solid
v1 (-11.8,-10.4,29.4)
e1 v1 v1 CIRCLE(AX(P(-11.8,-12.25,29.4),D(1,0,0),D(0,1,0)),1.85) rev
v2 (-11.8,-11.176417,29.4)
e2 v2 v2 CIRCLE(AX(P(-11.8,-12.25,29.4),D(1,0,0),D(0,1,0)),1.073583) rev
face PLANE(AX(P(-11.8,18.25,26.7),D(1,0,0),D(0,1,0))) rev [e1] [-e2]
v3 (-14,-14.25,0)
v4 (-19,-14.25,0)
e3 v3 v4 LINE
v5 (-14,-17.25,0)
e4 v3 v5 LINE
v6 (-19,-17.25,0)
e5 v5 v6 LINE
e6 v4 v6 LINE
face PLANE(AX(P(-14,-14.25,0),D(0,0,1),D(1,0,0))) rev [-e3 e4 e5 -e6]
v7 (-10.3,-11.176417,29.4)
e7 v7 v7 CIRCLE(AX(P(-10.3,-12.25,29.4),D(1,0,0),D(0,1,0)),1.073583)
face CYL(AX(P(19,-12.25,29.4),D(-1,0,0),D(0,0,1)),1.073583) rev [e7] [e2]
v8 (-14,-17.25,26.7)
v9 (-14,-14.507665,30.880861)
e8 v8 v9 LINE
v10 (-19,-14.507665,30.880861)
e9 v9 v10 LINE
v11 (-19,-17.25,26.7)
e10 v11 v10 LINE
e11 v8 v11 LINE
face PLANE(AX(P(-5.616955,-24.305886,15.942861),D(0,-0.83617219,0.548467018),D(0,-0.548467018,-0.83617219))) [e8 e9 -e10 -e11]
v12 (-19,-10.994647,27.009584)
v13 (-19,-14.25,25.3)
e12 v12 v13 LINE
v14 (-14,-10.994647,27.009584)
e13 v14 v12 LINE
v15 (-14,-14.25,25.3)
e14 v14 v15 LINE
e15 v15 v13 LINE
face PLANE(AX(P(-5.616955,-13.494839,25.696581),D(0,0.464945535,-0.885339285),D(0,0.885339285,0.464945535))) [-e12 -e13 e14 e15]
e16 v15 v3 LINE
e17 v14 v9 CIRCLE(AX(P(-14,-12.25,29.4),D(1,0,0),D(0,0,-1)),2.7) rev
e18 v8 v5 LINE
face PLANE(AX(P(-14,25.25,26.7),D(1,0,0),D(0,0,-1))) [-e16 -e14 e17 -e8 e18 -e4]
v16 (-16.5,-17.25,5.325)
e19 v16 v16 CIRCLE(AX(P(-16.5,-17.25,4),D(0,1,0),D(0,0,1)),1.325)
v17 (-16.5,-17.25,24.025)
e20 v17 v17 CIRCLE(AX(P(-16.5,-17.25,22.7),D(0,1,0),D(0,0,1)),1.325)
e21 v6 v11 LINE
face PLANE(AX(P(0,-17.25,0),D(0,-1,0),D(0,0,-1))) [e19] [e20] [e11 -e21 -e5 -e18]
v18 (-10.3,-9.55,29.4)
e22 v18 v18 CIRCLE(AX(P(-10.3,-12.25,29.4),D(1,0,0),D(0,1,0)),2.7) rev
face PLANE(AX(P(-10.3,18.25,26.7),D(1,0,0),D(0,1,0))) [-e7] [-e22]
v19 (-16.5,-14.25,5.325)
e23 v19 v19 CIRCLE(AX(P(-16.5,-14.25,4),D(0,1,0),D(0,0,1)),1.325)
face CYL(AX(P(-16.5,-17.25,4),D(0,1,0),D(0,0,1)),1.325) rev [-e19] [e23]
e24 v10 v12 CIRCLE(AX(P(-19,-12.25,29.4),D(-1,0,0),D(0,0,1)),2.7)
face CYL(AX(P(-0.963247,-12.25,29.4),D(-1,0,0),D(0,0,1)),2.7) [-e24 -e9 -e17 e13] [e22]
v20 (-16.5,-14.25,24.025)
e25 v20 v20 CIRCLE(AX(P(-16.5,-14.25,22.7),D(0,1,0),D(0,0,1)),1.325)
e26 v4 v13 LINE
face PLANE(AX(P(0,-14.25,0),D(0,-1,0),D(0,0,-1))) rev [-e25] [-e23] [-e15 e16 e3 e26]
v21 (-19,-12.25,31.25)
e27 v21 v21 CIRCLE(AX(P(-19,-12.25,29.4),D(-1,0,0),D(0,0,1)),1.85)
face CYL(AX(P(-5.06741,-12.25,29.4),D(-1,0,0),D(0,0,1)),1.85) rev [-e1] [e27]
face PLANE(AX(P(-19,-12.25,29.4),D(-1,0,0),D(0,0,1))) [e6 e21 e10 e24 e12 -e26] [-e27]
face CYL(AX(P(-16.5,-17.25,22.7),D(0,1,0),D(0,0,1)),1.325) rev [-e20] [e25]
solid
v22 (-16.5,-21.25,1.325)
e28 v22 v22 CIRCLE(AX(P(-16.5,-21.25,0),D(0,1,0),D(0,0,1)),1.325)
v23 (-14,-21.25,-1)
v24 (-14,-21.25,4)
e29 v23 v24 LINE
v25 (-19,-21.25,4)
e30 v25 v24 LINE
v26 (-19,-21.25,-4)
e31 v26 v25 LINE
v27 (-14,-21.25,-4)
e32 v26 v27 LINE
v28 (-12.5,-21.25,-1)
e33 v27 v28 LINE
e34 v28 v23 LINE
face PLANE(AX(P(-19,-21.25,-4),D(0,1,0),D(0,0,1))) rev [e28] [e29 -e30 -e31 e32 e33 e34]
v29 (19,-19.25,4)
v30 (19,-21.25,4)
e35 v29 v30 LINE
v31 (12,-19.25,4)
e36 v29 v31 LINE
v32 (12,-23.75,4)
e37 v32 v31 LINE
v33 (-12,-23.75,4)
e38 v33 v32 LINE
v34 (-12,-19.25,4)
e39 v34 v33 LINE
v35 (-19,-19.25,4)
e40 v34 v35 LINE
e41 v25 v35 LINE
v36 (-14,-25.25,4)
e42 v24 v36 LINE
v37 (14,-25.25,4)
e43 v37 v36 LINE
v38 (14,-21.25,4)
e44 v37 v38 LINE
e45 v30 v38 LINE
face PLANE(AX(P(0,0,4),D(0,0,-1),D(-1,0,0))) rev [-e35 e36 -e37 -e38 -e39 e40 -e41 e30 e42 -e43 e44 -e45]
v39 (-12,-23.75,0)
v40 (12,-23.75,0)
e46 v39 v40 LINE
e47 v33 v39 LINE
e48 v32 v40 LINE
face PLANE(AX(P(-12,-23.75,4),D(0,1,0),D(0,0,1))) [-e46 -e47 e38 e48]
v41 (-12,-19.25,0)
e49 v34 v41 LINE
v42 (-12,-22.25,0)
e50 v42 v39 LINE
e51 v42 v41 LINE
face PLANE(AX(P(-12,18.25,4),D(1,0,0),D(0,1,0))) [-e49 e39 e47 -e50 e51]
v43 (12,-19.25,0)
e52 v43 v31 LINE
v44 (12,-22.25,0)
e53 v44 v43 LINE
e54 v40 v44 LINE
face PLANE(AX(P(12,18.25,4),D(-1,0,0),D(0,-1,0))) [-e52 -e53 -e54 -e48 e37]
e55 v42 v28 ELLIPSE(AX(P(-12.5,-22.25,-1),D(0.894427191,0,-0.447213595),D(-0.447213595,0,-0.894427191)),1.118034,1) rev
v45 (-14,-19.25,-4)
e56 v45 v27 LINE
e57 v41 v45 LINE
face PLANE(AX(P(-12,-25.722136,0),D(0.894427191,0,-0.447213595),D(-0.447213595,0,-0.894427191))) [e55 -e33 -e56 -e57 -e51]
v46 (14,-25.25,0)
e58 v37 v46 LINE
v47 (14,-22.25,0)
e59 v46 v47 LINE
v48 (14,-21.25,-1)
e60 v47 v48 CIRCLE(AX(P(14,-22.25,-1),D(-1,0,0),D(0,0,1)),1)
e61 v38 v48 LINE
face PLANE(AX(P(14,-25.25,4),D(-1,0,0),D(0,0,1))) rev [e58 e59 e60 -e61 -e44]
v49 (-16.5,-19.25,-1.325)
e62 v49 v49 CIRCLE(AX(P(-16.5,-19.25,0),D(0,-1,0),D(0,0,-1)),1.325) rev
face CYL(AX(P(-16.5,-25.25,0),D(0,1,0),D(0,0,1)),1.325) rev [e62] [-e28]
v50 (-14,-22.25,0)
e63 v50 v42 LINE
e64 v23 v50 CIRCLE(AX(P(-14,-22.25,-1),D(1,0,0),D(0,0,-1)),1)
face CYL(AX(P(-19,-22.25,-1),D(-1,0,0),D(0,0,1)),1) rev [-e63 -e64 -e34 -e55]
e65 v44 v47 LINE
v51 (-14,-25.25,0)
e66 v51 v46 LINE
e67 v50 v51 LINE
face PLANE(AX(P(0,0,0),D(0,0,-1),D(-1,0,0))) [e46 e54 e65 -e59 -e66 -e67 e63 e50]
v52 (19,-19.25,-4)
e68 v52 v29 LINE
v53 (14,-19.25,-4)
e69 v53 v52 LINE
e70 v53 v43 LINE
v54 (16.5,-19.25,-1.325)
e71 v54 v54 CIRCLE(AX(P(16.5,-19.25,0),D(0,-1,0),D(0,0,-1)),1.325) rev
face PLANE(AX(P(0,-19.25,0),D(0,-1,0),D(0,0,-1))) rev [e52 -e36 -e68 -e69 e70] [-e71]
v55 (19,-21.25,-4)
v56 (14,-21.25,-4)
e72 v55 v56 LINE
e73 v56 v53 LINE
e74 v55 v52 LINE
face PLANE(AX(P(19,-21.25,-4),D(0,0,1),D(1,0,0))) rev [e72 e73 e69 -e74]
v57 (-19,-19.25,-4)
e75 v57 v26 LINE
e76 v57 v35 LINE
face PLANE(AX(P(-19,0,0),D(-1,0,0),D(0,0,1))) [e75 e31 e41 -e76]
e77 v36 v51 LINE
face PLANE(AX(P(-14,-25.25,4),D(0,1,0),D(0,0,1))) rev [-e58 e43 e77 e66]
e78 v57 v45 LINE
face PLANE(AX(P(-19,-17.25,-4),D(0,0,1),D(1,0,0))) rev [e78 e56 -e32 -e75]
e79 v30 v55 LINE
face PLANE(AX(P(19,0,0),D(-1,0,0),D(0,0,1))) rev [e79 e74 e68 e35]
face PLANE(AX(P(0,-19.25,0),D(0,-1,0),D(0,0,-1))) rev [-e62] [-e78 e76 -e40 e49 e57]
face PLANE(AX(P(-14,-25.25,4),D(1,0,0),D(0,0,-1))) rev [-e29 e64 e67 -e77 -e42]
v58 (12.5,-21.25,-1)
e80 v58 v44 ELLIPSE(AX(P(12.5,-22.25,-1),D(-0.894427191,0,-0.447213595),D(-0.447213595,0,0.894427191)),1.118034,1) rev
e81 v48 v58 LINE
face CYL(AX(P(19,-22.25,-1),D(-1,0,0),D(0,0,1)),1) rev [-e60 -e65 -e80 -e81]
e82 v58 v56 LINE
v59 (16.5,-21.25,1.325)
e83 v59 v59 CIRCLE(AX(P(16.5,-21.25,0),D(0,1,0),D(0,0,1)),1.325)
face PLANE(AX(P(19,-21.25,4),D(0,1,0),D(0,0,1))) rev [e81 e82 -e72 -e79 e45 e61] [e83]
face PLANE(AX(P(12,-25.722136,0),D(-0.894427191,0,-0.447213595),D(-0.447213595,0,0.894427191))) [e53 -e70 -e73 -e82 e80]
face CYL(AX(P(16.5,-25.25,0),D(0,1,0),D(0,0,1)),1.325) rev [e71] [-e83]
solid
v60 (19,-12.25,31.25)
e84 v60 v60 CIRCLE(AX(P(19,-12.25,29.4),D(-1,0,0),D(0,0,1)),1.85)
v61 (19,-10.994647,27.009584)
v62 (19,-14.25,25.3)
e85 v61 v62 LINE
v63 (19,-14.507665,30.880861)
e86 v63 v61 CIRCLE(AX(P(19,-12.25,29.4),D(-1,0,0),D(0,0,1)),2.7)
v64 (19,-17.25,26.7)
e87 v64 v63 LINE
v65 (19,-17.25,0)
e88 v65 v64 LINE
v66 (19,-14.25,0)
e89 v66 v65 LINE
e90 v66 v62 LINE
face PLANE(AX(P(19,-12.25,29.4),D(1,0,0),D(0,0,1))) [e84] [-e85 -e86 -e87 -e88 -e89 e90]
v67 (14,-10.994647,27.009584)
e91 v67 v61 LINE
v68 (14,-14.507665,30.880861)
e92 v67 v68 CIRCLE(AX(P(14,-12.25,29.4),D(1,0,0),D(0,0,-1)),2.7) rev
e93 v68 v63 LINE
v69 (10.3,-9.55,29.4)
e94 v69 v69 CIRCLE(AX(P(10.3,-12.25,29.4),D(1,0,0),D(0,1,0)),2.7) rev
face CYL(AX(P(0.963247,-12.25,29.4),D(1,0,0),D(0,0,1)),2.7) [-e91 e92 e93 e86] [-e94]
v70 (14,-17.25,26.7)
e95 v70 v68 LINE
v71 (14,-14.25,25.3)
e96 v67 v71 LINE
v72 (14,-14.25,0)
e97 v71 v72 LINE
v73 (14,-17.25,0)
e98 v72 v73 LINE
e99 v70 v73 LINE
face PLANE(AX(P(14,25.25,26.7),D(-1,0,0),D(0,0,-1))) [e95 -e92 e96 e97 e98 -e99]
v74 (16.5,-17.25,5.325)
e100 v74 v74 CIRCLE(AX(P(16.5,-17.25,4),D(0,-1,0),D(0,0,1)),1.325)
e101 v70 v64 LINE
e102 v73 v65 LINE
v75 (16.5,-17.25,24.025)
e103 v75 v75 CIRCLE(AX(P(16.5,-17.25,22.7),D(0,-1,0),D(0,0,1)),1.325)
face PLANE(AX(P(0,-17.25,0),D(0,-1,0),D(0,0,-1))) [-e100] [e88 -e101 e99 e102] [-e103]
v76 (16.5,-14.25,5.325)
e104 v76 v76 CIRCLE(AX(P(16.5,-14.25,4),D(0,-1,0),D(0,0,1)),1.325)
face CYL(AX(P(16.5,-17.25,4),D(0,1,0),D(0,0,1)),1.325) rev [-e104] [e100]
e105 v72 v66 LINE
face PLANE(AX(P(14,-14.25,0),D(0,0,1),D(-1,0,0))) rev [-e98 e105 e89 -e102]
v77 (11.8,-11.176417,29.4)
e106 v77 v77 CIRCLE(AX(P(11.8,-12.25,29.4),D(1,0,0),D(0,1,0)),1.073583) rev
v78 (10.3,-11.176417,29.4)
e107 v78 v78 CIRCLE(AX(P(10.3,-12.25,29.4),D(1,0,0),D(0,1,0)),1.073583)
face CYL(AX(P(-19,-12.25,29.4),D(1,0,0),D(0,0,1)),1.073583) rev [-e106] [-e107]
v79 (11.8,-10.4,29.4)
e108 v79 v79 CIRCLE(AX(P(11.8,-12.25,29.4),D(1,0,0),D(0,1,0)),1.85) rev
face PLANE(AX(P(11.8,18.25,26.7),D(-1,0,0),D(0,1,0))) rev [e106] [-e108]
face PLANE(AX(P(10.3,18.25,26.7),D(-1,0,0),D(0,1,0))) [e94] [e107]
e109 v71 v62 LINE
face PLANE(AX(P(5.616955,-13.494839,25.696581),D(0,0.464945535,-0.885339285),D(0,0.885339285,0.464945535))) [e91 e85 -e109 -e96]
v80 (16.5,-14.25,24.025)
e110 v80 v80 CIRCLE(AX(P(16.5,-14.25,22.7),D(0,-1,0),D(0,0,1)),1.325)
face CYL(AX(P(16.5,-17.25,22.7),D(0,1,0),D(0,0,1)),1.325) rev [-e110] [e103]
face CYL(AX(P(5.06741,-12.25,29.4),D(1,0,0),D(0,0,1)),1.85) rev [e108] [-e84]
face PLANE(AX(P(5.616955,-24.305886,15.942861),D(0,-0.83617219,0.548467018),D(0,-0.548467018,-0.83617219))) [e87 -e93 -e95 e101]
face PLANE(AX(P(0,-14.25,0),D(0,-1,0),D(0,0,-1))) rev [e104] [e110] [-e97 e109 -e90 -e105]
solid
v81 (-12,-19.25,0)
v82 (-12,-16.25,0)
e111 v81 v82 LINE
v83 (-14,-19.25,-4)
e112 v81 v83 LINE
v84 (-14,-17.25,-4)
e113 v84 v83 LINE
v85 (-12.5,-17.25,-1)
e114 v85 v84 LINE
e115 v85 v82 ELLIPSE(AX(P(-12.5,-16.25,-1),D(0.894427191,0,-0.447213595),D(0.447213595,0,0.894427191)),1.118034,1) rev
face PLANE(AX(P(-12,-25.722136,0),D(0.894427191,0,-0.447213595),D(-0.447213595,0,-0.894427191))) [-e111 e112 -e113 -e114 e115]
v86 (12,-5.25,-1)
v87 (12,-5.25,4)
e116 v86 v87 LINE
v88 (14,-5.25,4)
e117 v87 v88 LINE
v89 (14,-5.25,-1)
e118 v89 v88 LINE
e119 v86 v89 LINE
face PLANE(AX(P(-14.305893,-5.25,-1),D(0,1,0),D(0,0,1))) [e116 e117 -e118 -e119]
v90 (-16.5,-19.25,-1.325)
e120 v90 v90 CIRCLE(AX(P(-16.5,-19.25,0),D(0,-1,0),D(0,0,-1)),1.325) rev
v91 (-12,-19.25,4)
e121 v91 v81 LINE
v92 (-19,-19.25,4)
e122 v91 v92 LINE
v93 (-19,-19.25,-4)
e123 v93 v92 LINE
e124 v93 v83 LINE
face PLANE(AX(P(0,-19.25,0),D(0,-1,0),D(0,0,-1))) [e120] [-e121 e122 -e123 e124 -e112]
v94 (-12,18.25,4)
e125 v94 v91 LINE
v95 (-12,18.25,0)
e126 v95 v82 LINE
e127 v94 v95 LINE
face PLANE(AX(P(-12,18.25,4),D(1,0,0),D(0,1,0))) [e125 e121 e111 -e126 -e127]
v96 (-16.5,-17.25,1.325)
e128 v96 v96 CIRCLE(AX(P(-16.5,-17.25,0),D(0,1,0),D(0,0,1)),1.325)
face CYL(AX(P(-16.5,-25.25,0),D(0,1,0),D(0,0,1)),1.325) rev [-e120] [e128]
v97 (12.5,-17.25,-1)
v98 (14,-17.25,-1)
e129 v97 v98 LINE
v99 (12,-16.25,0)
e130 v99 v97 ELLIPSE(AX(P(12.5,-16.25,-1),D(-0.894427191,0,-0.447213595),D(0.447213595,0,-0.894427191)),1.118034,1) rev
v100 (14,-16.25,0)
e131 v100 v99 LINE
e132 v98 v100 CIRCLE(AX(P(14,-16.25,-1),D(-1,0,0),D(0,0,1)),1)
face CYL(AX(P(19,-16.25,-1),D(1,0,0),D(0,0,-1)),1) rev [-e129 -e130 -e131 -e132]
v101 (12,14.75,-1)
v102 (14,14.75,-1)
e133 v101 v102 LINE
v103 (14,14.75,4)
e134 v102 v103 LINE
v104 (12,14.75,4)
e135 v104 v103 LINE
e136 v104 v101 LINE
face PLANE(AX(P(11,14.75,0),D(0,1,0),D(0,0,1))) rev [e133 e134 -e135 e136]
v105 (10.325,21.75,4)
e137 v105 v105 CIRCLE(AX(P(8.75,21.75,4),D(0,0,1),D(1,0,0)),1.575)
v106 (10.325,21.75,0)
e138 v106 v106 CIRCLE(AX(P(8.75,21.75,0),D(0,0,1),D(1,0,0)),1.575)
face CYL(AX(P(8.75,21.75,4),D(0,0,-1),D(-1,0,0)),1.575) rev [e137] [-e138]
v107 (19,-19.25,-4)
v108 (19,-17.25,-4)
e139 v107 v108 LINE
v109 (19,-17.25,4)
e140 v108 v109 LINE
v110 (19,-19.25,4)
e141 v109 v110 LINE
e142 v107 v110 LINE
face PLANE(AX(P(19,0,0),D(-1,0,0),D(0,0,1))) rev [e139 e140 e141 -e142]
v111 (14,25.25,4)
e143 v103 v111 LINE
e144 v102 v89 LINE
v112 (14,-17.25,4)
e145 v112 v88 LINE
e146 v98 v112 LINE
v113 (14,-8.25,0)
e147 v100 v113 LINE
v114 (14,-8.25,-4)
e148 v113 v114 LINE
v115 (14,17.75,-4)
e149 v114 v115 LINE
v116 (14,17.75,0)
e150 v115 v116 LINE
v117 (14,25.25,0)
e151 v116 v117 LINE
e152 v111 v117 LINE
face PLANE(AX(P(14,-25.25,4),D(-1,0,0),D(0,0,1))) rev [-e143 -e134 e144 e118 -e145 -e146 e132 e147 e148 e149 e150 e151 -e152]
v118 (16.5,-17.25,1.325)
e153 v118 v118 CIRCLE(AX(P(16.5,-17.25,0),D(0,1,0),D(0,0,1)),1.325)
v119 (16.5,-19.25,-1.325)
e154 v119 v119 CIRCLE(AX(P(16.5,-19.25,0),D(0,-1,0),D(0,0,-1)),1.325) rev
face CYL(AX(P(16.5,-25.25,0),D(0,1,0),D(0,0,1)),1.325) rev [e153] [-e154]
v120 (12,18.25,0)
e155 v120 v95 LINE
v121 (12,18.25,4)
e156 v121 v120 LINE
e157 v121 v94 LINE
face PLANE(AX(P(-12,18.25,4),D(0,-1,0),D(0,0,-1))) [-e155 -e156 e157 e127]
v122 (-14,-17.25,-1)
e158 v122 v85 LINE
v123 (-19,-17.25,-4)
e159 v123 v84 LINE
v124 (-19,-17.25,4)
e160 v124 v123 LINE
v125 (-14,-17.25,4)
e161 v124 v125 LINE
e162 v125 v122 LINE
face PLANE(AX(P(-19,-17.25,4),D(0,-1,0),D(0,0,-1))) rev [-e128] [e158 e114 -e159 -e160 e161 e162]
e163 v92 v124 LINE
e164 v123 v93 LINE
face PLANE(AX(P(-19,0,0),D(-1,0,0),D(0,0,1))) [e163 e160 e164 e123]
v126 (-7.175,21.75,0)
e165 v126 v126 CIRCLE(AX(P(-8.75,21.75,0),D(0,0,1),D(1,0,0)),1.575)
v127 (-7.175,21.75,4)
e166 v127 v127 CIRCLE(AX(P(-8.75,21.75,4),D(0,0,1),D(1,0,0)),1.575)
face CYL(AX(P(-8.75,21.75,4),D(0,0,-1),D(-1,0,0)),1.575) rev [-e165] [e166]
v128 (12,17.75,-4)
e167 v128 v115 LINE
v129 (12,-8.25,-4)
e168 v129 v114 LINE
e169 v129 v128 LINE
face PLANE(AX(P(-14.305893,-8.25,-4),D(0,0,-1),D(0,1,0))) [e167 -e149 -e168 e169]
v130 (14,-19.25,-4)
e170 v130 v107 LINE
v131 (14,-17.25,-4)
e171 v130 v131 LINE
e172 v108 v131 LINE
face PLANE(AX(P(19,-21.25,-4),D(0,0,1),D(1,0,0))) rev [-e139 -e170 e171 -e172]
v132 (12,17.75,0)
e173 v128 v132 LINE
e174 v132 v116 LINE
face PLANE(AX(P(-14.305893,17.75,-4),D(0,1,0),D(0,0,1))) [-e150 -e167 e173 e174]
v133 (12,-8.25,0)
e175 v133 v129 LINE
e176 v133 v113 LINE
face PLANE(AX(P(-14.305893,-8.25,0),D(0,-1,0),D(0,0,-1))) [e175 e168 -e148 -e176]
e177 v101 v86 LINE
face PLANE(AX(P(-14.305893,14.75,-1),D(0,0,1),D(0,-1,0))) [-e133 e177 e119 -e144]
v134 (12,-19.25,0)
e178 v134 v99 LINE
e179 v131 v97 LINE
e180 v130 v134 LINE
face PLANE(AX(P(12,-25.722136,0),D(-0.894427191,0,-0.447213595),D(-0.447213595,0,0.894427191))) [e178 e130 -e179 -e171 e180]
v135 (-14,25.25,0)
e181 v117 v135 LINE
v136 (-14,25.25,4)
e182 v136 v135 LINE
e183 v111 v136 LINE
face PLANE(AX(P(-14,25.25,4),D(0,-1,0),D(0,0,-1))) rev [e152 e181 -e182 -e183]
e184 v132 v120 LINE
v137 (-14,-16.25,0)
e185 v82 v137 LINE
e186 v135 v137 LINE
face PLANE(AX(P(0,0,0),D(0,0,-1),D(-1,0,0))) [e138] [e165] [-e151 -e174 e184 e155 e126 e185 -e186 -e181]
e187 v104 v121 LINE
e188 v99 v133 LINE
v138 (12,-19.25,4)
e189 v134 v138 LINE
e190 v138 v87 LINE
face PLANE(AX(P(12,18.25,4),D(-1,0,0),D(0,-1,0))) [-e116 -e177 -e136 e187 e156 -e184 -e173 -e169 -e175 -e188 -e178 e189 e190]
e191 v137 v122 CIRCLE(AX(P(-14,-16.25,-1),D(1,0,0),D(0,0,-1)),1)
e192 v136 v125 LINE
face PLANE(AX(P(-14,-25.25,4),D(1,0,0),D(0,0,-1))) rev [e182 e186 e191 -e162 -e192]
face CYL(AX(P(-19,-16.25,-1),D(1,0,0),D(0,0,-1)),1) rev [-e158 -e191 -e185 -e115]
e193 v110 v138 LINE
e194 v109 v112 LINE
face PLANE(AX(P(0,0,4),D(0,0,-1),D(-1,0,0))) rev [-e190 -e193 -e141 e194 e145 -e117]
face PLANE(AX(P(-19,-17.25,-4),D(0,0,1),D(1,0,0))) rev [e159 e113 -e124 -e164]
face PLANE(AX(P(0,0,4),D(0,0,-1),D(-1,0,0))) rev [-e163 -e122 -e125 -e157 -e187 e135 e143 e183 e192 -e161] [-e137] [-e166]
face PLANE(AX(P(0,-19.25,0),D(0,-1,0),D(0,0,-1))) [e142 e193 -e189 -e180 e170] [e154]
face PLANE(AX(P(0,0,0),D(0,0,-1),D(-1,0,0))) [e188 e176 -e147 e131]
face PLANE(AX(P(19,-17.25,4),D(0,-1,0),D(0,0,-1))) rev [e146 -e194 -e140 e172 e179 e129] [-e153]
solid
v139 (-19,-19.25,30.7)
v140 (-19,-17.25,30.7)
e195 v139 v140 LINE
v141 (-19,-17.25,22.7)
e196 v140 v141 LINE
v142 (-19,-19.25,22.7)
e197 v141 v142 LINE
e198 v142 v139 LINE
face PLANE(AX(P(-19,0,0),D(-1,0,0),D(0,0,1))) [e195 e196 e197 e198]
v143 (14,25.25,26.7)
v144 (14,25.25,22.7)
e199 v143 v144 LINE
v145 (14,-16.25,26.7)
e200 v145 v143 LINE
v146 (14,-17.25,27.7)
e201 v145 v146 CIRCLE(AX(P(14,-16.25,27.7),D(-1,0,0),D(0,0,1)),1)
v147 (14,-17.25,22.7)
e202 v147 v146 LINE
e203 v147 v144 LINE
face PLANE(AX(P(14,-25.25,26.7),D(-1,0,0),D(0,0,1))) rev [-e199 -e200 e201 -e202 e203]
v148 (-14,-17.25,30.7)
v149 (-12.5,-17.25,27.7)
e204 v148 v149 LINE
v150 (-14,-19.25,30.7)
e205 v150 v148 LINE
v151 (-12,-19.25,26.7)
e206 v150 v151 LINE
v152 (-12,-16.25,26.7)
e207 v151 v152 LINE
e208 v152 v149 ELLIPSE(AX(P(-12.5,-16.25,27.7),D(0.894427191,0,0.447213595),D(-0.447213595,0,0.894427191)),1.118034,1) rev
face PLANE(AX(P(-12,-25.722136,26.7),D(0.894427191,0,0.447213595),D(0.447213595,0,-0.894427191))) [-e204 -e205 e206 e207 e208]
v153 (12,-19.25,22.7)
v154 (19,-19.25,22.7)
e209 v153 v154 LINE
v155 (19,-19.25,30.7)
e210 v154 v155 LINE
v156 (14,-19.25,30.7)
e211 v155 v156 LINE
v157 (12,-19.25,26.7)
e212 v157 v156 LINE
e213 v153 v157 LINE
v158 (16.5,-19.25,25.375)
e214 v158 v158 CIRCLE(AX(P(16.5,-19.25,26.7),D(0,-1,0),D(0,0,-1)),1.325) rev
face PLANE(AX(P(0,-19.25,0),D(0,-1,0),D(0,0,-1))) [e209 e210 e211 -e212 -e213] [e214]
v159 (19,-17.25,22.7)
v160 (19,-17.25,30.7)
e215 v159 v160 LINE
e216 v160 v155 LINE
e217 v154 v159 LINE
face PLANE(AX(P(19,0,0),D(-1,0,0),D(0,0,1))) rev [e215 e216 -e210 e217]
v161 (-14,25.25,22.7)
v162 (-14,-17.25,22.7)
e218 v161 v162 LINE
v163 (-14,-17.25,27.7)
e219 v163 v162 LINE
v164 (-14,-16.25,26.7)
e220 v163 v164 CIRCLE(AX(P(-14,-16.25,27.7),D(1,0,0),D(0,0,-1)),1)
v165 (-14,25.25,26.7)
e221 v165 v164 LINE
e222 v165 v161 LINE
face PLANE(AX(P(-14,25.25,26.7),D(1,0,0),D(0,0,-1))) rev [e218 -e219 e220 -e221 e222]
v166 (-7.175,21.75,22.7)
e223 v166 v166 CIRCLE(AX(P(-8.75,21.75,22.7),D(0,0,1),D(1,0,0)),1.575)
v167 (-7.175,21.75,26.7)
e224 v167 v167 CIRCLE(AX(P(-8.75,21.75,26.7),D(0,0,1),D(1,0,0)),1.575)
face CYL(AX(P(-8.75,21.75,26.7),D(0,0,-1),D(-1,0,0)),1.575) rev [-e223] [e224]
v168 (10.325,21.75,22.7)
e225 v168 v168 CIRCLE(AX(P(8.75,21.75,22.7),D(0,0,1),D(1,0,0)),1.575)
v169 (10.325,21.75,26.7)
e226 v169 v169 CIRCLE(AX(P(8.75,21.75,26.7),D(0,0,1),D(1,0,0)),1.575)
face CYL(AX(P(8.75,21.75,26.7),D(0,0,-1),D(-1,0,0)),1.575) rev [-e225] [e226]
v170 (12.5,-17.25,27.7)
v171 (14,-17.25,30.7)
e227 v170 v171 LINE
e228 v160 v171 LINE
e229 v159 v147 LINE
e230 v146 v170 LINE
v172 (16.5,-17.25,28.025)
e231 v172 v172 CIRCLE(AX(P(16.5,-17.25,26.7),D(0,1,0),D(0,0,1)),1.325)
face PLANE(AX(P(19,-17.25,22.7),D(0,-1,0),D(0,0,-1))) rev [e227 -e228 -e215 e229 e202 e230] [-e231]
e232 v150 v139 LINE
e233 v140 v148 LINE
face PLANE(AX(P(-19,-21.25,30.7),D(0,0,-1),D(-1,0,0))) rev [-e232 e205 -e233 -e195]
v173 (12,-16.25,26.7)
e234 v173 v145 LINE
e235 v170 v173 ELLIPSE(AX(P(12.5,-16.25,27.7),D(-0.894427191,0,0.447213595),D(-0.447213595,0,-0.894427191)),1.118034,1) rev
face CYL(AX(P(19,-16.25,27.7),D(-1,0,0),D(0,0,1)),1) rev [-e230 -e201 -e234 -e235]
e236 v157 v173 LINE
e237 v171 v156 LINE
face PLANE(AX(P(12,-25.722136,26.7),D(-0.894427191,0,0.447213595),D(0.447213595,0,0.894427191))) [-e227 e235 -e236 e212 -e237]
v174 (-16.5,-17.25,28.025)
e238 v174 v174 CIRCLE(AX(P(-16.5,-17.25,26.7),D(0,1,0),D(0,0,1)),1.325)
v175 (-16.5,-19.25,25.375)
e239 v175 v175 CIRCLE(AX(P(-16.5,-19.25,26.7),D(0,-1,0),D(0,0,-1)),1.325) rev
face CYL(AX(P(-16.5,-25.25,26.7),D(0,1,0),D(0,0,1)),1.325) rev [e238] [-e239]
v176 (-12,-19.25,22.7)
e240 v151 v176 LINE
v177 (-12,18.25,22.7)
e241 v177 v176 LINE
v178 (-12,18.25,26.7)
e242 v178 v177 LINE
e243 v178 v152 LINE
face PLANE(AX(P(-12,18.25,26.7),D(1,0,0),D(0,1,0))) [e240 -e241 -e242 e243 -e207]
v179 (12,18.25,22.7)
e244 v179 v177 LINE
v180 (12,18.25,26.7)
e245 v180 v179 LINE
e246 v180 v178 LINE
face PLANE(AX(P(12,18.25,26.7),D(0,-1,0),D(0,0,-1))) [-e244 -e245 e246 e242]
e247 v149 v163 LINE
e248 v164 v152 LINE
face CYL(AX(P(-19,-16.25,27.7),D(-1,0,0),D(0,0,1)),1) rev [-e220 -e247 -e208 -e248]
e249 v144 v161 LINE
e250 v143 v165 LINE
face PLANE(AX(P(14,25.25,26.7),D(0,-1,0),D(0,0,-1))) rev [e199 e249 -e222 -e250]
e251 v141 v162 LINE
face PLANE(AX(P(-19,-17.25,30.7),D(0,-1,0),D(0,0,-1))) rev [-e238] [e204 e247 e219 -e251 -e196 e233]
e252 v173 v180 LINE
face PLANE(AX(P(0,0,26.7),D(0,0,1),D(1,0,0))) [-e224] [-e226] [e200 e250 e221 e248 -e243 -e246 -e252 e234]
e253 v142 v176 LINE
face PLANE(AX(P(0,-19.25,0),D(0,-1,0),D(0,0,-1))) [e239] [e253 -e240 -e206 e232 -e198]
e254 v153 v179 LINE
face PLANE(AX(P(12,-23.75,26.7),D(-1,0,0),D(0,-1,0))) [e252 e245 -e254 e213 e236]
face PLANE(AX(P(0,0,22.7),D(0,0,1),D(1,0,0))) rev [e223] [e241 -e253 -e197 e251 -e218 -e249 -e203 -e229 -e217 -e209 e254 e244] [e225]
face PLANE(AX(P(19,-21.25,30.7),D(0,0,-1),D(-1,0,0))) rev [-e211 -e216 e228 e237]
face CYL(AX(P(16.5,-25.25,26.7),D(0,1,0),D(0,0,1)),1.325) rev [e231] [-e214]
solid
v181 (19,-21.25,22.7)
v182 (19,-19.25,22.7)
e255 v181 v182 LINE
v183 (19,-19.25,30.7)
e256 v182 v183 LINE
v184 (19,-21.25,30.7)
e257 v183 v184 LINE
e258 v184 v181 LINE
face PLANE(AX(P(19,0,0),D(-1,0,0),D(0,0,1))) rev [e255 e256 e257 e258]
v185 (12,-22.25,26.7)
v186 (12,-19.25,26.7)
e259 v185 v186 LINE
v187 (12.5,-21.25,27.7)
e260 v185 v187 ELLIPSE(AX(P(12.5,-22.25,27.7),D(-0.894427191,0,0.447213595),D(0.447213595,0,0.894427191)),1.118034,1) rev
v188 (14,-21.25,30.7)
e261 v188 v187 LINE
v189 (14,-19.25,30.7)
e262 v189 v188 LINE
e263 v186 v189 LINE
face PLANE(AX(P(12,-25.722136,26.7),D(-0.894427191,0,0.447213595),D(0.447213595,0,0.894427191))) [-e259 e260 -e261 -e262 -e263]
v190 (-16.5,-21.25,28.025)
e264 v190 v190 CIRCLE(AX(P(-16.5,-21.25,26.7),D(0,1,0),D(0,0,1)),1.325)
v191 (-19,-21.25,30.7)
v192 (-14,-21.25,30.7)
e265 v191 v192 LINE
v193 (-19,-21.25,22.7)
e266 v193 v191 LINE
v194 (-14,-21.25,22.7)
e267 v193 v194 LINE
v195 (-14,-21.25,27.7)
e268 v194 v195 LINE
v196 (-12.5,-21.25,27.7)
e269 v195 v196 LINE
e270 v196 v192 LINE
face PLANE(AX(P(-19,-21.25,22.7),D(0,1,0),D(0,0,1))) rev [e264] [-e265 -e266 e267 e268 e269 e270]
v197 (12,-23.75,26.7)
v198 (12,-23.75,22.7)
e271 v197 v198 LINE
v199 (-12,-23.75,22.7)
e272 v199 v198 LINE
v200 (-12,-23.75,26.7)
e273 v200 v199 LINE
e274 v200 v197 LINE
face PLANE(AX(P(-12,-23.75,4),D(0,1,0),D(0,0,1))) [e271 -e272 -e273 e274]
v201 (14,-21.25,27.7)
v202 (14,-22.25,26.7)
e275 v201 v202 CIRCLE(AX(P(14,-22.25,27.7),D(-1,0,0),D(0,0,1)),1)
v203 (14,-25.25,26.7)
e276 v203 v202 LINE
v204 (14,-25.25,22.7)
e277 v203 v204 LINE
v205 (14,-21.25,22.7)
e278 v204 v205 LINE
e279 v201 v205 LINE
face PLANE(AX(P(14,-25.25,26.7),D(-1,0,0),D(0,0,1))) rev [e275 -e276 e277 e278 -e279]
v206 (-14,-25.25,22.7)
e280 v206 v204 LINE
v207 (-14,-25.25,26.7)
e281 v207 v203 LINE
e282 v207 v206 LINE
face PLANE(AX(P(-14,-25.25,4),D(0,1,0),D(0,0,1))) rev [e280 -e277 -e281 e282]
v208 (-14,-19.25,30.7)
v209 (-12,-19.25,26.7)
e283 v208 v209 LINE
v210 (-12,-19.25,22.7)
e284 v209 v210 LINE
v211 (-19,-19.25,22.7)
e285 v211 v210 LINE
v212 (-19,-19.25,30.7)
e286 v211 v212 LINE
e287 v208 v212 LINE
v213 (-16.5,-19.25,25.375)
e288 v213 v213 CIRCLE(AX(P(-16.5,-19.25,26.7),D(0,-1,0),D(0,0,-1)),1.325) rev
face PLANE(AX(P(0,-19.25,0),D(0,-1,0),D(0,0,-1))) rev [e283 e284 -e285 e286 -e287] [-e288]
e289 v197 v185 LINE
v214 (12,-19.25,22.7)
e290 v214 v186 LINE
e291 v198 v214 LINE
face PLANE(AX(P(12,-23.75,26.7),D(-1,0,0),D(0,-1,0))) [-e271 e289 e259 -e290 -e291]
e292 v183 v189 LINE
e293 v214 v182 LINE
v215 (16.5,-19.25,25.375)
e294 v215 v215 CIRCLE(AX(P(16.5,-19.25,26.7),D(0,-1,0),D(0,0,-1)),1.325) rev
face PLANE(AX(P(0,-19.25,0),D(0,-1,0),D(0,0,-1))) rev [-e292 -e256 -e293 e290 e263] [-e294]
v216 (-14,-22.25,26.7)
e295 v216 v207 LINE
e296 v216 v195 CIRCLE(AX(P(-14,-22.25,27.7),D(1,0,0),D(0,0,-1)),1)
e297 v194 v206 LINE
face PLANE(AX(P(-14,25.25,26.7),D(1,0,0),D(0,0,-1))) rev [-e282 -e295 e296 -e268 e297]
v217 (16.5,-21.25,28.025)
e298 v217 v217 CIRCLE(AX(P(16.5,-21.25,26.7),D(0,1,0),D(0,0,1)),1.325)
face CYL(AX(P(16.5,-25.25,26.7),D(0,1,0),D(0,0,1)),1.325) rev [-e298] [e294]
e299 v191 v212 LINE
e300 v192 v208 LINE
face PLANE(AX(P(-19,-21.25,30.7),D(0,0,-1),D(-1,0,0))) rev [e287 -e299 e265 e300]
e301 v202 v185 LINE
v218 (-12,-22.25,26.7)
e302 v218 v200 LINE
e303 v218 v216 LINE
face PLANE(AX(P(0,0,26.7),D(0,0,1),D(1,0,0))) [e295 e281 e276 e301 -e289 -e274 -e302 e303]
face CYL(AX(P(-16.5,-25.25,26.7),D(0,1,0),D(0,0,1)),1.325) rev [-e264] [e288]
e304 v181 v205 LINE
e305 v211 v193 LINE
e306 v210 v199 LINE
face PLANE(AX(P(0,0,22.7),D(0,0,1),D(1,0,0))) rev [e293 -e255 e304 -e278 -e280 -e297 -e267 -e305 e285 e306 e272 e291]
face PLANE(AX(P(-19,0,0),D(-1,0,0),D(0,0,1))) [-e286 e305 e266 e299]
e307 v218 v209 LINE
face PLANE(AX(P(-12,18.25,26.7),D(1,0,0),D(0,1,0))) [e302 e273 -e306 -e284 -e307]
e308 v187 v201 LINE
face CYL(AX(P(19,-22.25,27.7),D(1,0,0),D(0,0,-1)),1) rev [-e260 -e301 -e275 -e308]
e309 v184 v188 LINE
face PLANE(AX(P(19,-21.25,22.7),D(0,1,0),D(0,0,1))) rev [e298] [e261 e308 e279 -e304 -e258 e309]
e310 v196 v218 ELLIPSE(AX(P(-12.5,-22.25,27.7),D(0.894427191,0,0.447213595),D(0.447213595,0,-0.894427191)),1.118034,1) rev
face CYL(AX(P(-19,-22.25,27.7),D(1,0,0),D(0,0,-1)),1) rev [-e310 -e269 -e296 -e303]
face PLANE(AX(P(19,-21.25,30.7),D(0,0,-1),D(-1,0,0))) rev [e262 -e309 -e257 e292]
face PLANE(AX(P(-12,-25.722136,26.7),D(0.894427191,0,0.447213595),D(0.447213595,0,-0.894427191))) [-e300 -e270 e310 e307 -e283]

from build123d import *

# Parameters (mm, degrees)
SKETCH1_W            = 28
SKETCH1_H            = 50.5
SKETCH1_R            = 1.575
SKETCH1_W_2          = 24
SKETCH1_H_2          = 42
BOSS_EXTRUDE1_DEPTH  = 4
SKETCH2_W            = 10
SKETCH2_H            = 1.5
BOSS_EXTRUDE2_DEPTH  = 18.7
SKETCH3_W            = 28
SKETCH3_H            = 50.5
SKETCH3_R            = 1.575
SKETCH3_W_2          = 24
SKETCH3_H_2          = 42
BOSS_EXTRUDE3_DEPTH  = 4
SKETCH4_W            = 8
SKETCH4_H            = 4
BOSS_EXTRUDE4_DEPTH  = 5
SKETCH5_W            = 8
SKETCH5_H            = 4
BOSS_EXTRUDE5_DEPTH  = 5
BOSS_EXTRUDE6_DEPTH  = 4
FILLET1_R            = 1
SKETCH7_R            = 1.325
CUT_EXTRUDE1_DEPTH   = 56.765042814
SKETCH8_W            = 10
SKETCH8_H            = 18.7
CUT_EXTRUDE2_DEPTH   = 61.864521685
SPLIT1_START         = -25.25
SPLIT1_OUTLINE_R     = 1.325
SPLIT1_DEPTH         = 6
SPLIT1_START_2       = -21.25
SPLIT1_2_OUTLINE_R   = 1.325
SPLIT1_2_DEPTH       = 2
SPLIT1_3_OUTLINE_W   = 28
SPLIT1_3_OUTLINE_H   = 4
SPLIT1_3_DEPTH       = 1.5
SPLIT1_START_3       = -23.75
SPLIT1_4_OUTLINE_W   = 2
SPLIT1_4_OUTLINE_H   = 4
SPLIT1_4_DEPTH       = 2.5
SPLIT1_START_4       = -14
SPLIT1_5_DEPTH       = 2
SPLIT1_START_5       = 12
SPLIT1_6_DEPTH       = 2
SPLIT1_START_6       = -23
SPLIT1_7_DEPTH       = 1.75
SPLIT1_8_OUTLINE_R   = 1.325
SPLIT1_8_DEPTH       = 2
SPLIT1_9_OUTLINE_W   = 28
SPLIT1_9_OUTLINE_H   = 4
SPLIT1_9_DEPTH       = 1.5
SPLIT1_10_OUTLINE_W  = 2
SPLIT1_10_OUTLINE_H  = 4
SPLIT1_10_DEPTH      = 2.5
SPLIT1_11_DEPTH      = 2
SPLIT1_12_DEPTH      = 2
SPLIT1_13_DEPTH      = 1.75
SPLIT1_14_OUTLINE_R  = 1.325
SPLIT1_14_DEPTH      = 6
SKETCH9_W            = 5
SKETCH9_H            = 26.7
BOSS_EXTRUDE7_DEPTH  = 3
SKETCH11_R           = 1.325
CUT_EXTRUDE4_DEPTH   = 3
SKETCH12_R           = 2.7
BOSS_EXTRUDE8_DEPTH  = 8.7
BOSS_EXTRUDE9_DEPTH  = 5
SKETCH16_R           = 1.073583211
CUT_EXTRUDE6_DEPTH   = 56.785056243
SKETCH17_R           = 1.85
CUT_EXTRUDE7_DEPTH   = 7.2
SKETCH18_W           = 4
SKETCH18_H           = 20
CUT_EXTRUDE8_DEPTH   = 3
BOSS_EXTRUDE10_DEPTH = 2


with BuildPart() as part:
    # Sketch1 → Boss-Extrude1 (new body)
    with BuildSketch(Plane.XY):
        Rectangle(SKETCH1_W, SKETCH1_H)
        with Locations((-8.75, 21.75)):
            Circle(SKETCH1_R, mode=Mode.SUBTRACT)
        with Locations((8.75, 21.75)):
            Circle(SKETCH1_R, mode=Mode.SUBTRACT)
        with Locations((0, -2.75)):
            Rectangle(SKETCH1_W_2, SKETCH1_H_2, mode=Mode.SUBTRACT)
    extrude(amount=BOSS_EXTRUDE1_DEPTH)

    # Sketch2 → Boss-Extrude2 (add)
    with BuildSketch(Plane.XY.offset(4)):
        with Locations((0, -24.5)):
            Rectangle(SKETCH2_W, SKETCH2_H)
    extrude(amount=BOSS_EXTRUDE2_DEPTH)

    # Sketch3 → Boss-Extrude3 (add)
    with BuildSketch(Plane.XY.offset(22.7)):
        Rectangle(SKETCH3_W, SKETCH3_H)
        with Locations((8.75, 21.75)):
            Circle(SKETCH3_R, mode=Mode.SUBTRACT)
        with Locations((-8.75, 21.75)):
            Circle(SKETCH3_R, mode=Mode.SUBTRACT)
        with Locations((0, -2.75)):
            Rectangle(SKETCH3_W_2, SKETCH3_H_2, mode=Mode.SUBTRACT)
    extrude(amount=BOSS_EXTRUDE3_DEPTH)

    # Sketch4 → Boss-Extrude4 (add)
    with BuildSketch(Plane(origin=(14, 0, 0), x_dir=(0, 0, -1), z_dir=(1, 0, 0))):
        with Locations((0, -19.25)):
            Rectangle(SKETCH4_W, SKETCH4_H)
        with Locations((-26.7, -19.25)):
            Rectangle(SKETCH4_W, SKETCH4_H)
    extrude(amount=BOSS_EXTRUDE4_DEPTH)

    # Sketch5 → Boss-Extrude5 (add)
    with BuildSketch(Plane.ZY.offset(14)):
        with Locations((0, -19.25)):
            Rectangle(SKETCH5_W, SKETCH5_H)
        with Locations((26.7, -19.25)):
            Rectangle(SKETCH5_W, SKETCH5_H)
    extrude(amount=BOSS_EXTRUDE5_DEPTH)

    # Sketch6 → Boss-Extrude6 (add)
    with BuildSketch(Plane(origin=(0, -17.25, 0), x_dir=(1, 0, 0), z_dir=(0, 1, 0))):
        Polygon((-14, 4), (-14, 0), (-12, 0), align=None)
        Polygon((12, 0), (14, 4), (14, 0), align=None)
        Polygon((14, -30.7), (14, -26.7), (12, -26.7), align=None)
        Polygon((-12, -26.7), (-14, -30.7), (-14, -26.7), align=None)
    extrude(amount=-BOSS_EXTRUDE6_DEPTH)

    # Fillet1
    fillet1_edges = [part.edges().sort_by_distance(p)[0] for p in [
        (-13, -17.25, 0),
        (-13, -21.25, 0),
        (13, -17.25, 0),
        (13, -21.25, 0),
        (13, -17.25, 26.7),
        (13, -21.25, 26.7),
        (-13, -17.25, 26.7),
        (-13, -21.25, 26.7),
    ]]
    fillet(fillet1_edges, radius=FILLET1_R)

    # Sketch7 → Cut-Extrude1 (cut, through all)
    with BuildSketch(Plane(origin=(0, -17.25, 0), x_dir=(1, 0, 0), z_dir=(0, 1, 0))):
        with Locations(Location((-16.5, 0, 0), (0, 0, 270))):
            Circle(SKETCH7_R)
        with Locations(Location((16.5, 0, 0), (0, 0, 270))):
            Circle(SKETCH7_R)
        with Locations(Location((-16.5, -26.7, 0), (0, 0, 270))):
            Circle(SKETCH7_R)
        with Locations(Location((16.5, -26.7, 0), (0, 0, 270))):
            Circle(SKETCH7_R)
    extrude(amount=-CUT_EXTRUDE1_DEPTH, mode=Mode.SUBTRACT)

    # Sketch8 → Cut-Extrude2 (cut, through all)
    with BuildSketch(Plane(origin=(0, -23.75, 0), x_dir=(1, 0, 0), z_dir=(0, 1, 0))):
        with Locations((0, -13.35)):
            Rectangle(SKETCH8_W, SKETCH8_H)
    extrude(amount=-CUT_EXTRUDE2_DEPTH, mode=Mode.SUBTRACT)


with BuildPart() as cut_extrude2_piece_1:
    # of the separate pieces the step leaves, piece 1, a body of its own (cut_extrude2_pieces)
    add(part.part.solids().sort_by_distance((-14, 25.25, 4))[0])

    # Split1 14 outline → Split1 14 (cut)
    with BuildSketch(Plane(origin=(0, 0, 0), x_dir=(1, 0, 0), z_dir=(0, 1, 0)).offset(SPLIT1_START)):
        Polygon((19, -4), (19, 4), (14, 4), (12, 0), (-12, 0), (-14, 4), (-19, 4), (-19, -4), align=None)
        with Locations((16.5, 0)):
            Circle(SPLIT1_14_OUTLINE_R, mode=Mode.SUBTRACT)
        with Locations((-16.5, 0)):
            Circle(SPLIT1_14_OUTLINE_R, mode=Mode.SUBTRACT)
    extrude(amount=SPLIT1_14_DEPTH, mode=Mode.SUBTRACT)

    # Sketch18 → Cut-Extrude8 (cut)
    with BuildSketch(Plane(origin=(14, 0, 0), x_dir=(0, 0, -1), z_dir=(1, 0, 0))):
        with Locations((-2, 4.75)):
            Rectangle(SKETCH18_W, SKETCH18_H)
    extrude(amount=-CUT_EXTRUDE8_DEPTH, mode=Mode.SUBTRACT)


with BuildPart() as cut_extrude2_piece_2:
    # of the separate pieces the step leaves, piece 2, a body of its own (cut_extrude2_pieces)
    add(part.part.solids().sort_by_distance((14, -22.25, 26.7))[0])

    # Split1: read off the stored shape, not the designer's step
    # Split1 outline → Split1 (cut)
    with BuildSketch(Plane(origin=(0, 0, 0), x_dir=(1, 0, 0), z_dir=(0, 1, 0)).offset(SPLIT1_START)):
        Polygon((14, -30.7), (19, -30.7), (19, -22.7), (-19, -22.7), (-19, -30.7), (-14, -30.7), (-12, -26.7), (12, -26.7), align=None)
        with Locations((16.5, -26.7)):
            Circle(SPLIT1_OUTLINE_R, mode=Mode.SUBTRACT)
        with Locations((-16.5, -26.7)):
            Circle(SPLIT1_OUTLINE_R, mode=Mode.SUBTRACT)
    extrude(amount=SPLIT1_DEPTH, mode=Mode.SUBTRACT)


with BuildPart() as body_3:
    # Split1 2 outline → Split1 2 (new body)
    # profile 1 of 2: a face of its own
    with BuildSketch(Plane(origin=(0, 0, 0), x_dir=(1, 0, 0), z_dir=(0, 1, 0)).offset(SPLIT1_START_2)):
        Polygon((14, -30.7), (19, -30.7), (19, -22.7), (12, -22.7), (12, -26.7), align=None)
        with Locations((16.5, -26.7)):
            Circle(SPLIT1_2_OUTLINE_R, mode=Mode.SUBTRACT)
    # profile 2 of 2: a face of its own
    with BuildSketch(Plane(origin=(0, 0, 0), x_dir=(1, 0, 0), z_dir=(0, 1, 0)).offset(SPLIT1_START_2)):
        Polygon((-14, -30.7), (-12, -26.7), (-12, -22.7), (-19, -22.7), (-19, -30.7), align=None)
        with Locations((-16.5, -26.7)):
            Circle(SPLIT1_2_OUTLINE_R, mode=Mode.SUBTRACT)
    extrude(amount=SPLIT1_2_DEPTH)

    # Split1 3 outline → Split1 3 (add)
    with BuildSketch(Plane(origin=(0, 0, 0), x_dir=(1, 0, 0), z_dir=(0, 1, 0)).offset(SPLIT1_START)):
        with Locations((0, -24.7)):
            Rectangle(SPLIT1_3_OUTLINE_W, SPLIT1_3_OUTLINE_H)
    extrude(amount=SPLIT1_3_DEPTH)

    # Split1 4 outline → Split1 4 (add)
    with BuildSketch(Plane(origin=(0, 0, 0), x_dir=(1, 0, 0), z_dir=(0, 1, 0)).offset(SPLIT1_START_3)):
        with Locations((13, -24.7)):
            Rectangle(SPLIT1_4_OUTLINE_W, SPLIT1_4_OUTLINE_H)
        with Locations((-13, -24.7)):
            Rectangle(SPLIT1_4_OUTLINE_W, SPLIT1_4_OUTLINE_H)
    extrude(amount=SPLIT1_4_DEPTH)

    # Split1 5 outline → Split1 5 (add)
    with BuildSketch(Plane.YZ.offset(SPLIT1_START_4)):
        with BuildLine():
            ThreePointArc((-21.25, 27.7), (-21.542893219, 26.992893219), (-22.25, 26.7))
            Line((-22.25, 26.7), (-21.25, 26.7))
            Line((-21.25, 26.7), (-21.25, 27.7))
        make_face()
    extrude(amount=SPLIT1_5_DEPTH)

    # Split1 6 outline → Split1 6 (add)
    with BuildSketch(Plane.YZ.offset(SPLIT1_START_5)):
        with BuildLine():
            ThreePointArc((-21.25, 27.7), (-21.542893219, 26.992893219), (-22.25, 26.7))
            Line((-22.25, 26.7), (-21.25, 26.7))
            Line((-21.25, 26.7), (-21.25, 27.7))
        make_face()
    extrude(amount=SPLIT1_6_DEPTH)

    # Split1 7 outline → Split1 7 (cut)
    with BuildSketch(Plane(origin=(0, 0, 0), x_dir=(1, 0, 0), z_dir=(0, 1, 0)).offset(SPLIT1_START_6)):
        Polygon((-11.15, -25), (-13.15, -29), (13.15, -29), (11.15, -25), align=None)
    extrude(amount=SPLIT1_7_DEPTH, mode=Mode.SUBTRACT)


with BuildPart() as body_4:
    # Split1 8 outline → Split1 8 (new body)
    # profile 1 of 2: a face of its own
    with BuildSketch(Plane(origin=(0, 0, 0), x_dir=(1, 0, 0), z_dir=(0, 1, 0)).offset(SPLIT1_START_2)):
        Polygon((14, 4), (12, 0), (12, -4), (19, -4), (19, 4), align=None)
        with Locations((16.5, 0)):
            Circle(SPLIT1_8_OUTLINE_R, mode=Mode.SUBTRACT)
    # profile 2 of 2: a face of its own
    with BuildSketch(Plane(origin=(0, 0, 0), x_dir=(1, 0, 0), z_dir=(0, 1, 0)).offset(SPLIT1_START_2)):
        Polygon((-12, -4), (-12, 0), (-14, 4), (-19, 4), (-19, -4), align=None)
        with Locations((-16.5, 0)):
            Circle(SPLIT1_8_OUTLINE_R, mode=Mode.SUBTRACT)
    extrude(amount=SPLIT1_8_DEPTH)

    # Split1 9 outline → Split1 9 (add)
    with BuildSketch(Plane(origin=(0, 0, 0), x_dir=(1, 0, 0), z_dir=(0, 1, 0)).offset(SPLIT1_START)):
        with Locations((0, -2)):
            Rectangle(SPLIT1_9_OUTLINE_W, SPLIT1_9_OUTLINE_H)
    extrude(amount=SPLIT1_9_DEPTH)

    # Split1 10 outline → Split1 10 (add)
    with BuildSketch(Plane(origin=(0, 0, 0), x_dir=(1, 0, 0), z_dir=(0, 1, 0)).offset(SPLIT1_START_3)):
        with Locations((13, -2)):
            Rectangle(SPLIT1_10_OUTLINE_W, SPLIT1_10_OUTLINE_H)
        with Locations((-13, -2)):
            Rectangle(SPLIT1_10_OUTLINE_W, SPLIT1_10_OUTLINE_H)
    extrude(amount=SPLIT1_10_DEPTH)

    # Split1 11 outline → Split1 11 (add)
    with BuildSketch(Plane.YZ.offset(SPLIT1_START_4)):
        with BuildLine():
            Line((-21.25, 0), (-22.25, 0))
            ThreePointArc((-22.25, 0), (-21.542893219, -0.292893219), (-21.25, -1))
            Line((-21.25, -1), (-21.25, 0))
        make_face()
    extrude(amount=SPLIT1_11_DEPTH)

    # Split1 12 outline → Split1 12 (add)
    with BuildSketch(Plane.YZ.offset(SPLIT1_START_5)):
        with BuildLine():
            Line((-21.25, 0), (-22.25, 0))
            ThreePointArc((-22.25, 0), (-21.542893219, -0.292893219), (-21.25, -1))
            Line((-21.25, -1), (-21.25, 0))
        make_face()
    extrude(amount=SPLIT1_12_DEPTH)

    # Split1 13 outline → Split1 13 (cut)
    with BuildSketch(Plane(origin=(0, 0, 0), x_dir=(1, 0, 0), z_dir=(0, 1, 0)).offset(SPLIT1_START_6)):
        Polygon((-13, 2), (-11, -2), (11, -2), (13, 2), align=None)
    extrude(amount=SPLIT1_13_DEPTH, mode=Mode.SUBTRACT)


with BuildPart() as body_5:
    # Sketch9 → Boss-Extrude7 (new body)
    with BuildSketch(Plane(origin=(0, -17.25, 0), x_dir=(1, 0, 0), z_dir=(0, 1, 0))):
        with Locations((-16.5, -13.35)):
            Rectangle(SKETCH9_W, SKETCH9_H)
    extrude(amount=BOSS_EXTRUDE7_DEPTH)

    # Sketch11 → Cut-Extrude4 (cut)
    with BuildSketch(Plane(origin=(0, -14.25, 0), x_dir=(1, 0, 0), z_dir=(0, 1, 0))):
        with Locations(Location((-16.5, -4, 0), (0, 0, 270))):
            Circle(SKETCH11_R)
        with Locations(Location((-16.5, -22.7, 0), (0, 0, 270))):
            Circle(SKETCH11_R)
    extrude(amount=-CUT_EXTRUDE4_DEPTH, mode=Mode.SUBTRACT)


with BuildPart() as body_6:
    # Sketch12 → Boss-Extrude8 (new body)
    with BuildSketch(Plane.ZY.offset(19)):
        with Locations((29.4, -12.25)):
            Circle(SKETCH12_R)
    extrude(amount=-BOSS_EXTRUDE8_DEPTH)


with BuildPart() as body_7:
    # Sketch13 → Boss-Extrude9 (new body)
    with BuildSketch(Plane.ZY.offset(19)):
        with BuildLine():
            Line((25.3, -14.25), (26.7, -17.25))
            Line((26.7, -17.25), (30.880860948, -14.507664912))
            ThreePointArc((30.880860948, -14.507664912), (27.585572751, -14.249463367), (27.00958393, -10.994647057))
            Line((27.00958393, -10.994647057), (25.3, -14.25))
        make_face()
    extrude(amount=-BOSS_EXTRUDE9_DEPTH)


with BuildPart() as body_6_1:
    add(body_6.part)

    # Combine1: union body 7, body 5
    add(body_7.part)
    add(body_5.part)

    # Sketch16 → Cut-Extrude6 (cut, through all)
    with BuildSketch(Plane.ZY.offset(19)):
        with Locations((29.4, -12.25)):
            Circle(SKETCH16_R)
    extrude(amount=-CUT_EXTRUDE6_DEPTH, mode=Mode.SUBTRACT)

    # Sketch17 → Cut-Extrude7 (cut)
    with BuildSketch(Plane.ZY.offset(19)):
        with Locations((29.4, -12.25)):
            Circle(SKETCH17_R)
    extrude(amount=-CUT_EXTRUDE7_DEPTH, mode=Mode.SUBTRACT)


with BuildPart() as body_6_2:
    # Mirror1: mirrored copy
    add(body_6_1.part.mirror(Plane(origin=(0, 0, 0), x_dir=(0, 0, 1), z_dir=(1, 0, 0))))


with BuildPart() as cut_extrude8_piece_1:
    # of the separate pieces the step leaves, piece 1, a body of its own (cut_extrude8_pieces)
    add(cut_extrude2_piece_1.part.solids().sort_by_distance((14, 14.75, 4))[0])



with BuildPart() as cut_extrude8_piece_2:
    # of the separate pieces the step leaves, piece 2, a body of its own (cut_extrude8_pieces)
    add(cut_extrude2_piece_1.part.solids().sort_by_distance((14, -17.25, 4))[0])


with BuildPart() as cut_extrude8_piece_1_1:
    add(cut_extrude8_piece_1.part)

    add(cut_extrude8_piece_2.part)  # Boss-Extrude10 merges Cut-Extrude8 piece 2
    # Sketch19 → Boss-Extrude10 (add)
    with BuildSketch(Plane(origin=(14, 0, 0), x_dir=(0, 0, -1), z_dir=(1, 0, 0))):
        Polygon((0, 14.75), (1, 14.75), (1, -5.25), (0, -5.25), (0, -8.25), (4, -8.25), (4, 17.75), (0, 17.75), align=None)
    extrude(amount=-BOSS_EXTRUDE10_DEPTH)


solid = Compound([cut_extrude2_piece_2.part, body_3.part, body_4.part, body_6_1.part, body_6_2.part, cut_extrude8_piece_1_1.part])
